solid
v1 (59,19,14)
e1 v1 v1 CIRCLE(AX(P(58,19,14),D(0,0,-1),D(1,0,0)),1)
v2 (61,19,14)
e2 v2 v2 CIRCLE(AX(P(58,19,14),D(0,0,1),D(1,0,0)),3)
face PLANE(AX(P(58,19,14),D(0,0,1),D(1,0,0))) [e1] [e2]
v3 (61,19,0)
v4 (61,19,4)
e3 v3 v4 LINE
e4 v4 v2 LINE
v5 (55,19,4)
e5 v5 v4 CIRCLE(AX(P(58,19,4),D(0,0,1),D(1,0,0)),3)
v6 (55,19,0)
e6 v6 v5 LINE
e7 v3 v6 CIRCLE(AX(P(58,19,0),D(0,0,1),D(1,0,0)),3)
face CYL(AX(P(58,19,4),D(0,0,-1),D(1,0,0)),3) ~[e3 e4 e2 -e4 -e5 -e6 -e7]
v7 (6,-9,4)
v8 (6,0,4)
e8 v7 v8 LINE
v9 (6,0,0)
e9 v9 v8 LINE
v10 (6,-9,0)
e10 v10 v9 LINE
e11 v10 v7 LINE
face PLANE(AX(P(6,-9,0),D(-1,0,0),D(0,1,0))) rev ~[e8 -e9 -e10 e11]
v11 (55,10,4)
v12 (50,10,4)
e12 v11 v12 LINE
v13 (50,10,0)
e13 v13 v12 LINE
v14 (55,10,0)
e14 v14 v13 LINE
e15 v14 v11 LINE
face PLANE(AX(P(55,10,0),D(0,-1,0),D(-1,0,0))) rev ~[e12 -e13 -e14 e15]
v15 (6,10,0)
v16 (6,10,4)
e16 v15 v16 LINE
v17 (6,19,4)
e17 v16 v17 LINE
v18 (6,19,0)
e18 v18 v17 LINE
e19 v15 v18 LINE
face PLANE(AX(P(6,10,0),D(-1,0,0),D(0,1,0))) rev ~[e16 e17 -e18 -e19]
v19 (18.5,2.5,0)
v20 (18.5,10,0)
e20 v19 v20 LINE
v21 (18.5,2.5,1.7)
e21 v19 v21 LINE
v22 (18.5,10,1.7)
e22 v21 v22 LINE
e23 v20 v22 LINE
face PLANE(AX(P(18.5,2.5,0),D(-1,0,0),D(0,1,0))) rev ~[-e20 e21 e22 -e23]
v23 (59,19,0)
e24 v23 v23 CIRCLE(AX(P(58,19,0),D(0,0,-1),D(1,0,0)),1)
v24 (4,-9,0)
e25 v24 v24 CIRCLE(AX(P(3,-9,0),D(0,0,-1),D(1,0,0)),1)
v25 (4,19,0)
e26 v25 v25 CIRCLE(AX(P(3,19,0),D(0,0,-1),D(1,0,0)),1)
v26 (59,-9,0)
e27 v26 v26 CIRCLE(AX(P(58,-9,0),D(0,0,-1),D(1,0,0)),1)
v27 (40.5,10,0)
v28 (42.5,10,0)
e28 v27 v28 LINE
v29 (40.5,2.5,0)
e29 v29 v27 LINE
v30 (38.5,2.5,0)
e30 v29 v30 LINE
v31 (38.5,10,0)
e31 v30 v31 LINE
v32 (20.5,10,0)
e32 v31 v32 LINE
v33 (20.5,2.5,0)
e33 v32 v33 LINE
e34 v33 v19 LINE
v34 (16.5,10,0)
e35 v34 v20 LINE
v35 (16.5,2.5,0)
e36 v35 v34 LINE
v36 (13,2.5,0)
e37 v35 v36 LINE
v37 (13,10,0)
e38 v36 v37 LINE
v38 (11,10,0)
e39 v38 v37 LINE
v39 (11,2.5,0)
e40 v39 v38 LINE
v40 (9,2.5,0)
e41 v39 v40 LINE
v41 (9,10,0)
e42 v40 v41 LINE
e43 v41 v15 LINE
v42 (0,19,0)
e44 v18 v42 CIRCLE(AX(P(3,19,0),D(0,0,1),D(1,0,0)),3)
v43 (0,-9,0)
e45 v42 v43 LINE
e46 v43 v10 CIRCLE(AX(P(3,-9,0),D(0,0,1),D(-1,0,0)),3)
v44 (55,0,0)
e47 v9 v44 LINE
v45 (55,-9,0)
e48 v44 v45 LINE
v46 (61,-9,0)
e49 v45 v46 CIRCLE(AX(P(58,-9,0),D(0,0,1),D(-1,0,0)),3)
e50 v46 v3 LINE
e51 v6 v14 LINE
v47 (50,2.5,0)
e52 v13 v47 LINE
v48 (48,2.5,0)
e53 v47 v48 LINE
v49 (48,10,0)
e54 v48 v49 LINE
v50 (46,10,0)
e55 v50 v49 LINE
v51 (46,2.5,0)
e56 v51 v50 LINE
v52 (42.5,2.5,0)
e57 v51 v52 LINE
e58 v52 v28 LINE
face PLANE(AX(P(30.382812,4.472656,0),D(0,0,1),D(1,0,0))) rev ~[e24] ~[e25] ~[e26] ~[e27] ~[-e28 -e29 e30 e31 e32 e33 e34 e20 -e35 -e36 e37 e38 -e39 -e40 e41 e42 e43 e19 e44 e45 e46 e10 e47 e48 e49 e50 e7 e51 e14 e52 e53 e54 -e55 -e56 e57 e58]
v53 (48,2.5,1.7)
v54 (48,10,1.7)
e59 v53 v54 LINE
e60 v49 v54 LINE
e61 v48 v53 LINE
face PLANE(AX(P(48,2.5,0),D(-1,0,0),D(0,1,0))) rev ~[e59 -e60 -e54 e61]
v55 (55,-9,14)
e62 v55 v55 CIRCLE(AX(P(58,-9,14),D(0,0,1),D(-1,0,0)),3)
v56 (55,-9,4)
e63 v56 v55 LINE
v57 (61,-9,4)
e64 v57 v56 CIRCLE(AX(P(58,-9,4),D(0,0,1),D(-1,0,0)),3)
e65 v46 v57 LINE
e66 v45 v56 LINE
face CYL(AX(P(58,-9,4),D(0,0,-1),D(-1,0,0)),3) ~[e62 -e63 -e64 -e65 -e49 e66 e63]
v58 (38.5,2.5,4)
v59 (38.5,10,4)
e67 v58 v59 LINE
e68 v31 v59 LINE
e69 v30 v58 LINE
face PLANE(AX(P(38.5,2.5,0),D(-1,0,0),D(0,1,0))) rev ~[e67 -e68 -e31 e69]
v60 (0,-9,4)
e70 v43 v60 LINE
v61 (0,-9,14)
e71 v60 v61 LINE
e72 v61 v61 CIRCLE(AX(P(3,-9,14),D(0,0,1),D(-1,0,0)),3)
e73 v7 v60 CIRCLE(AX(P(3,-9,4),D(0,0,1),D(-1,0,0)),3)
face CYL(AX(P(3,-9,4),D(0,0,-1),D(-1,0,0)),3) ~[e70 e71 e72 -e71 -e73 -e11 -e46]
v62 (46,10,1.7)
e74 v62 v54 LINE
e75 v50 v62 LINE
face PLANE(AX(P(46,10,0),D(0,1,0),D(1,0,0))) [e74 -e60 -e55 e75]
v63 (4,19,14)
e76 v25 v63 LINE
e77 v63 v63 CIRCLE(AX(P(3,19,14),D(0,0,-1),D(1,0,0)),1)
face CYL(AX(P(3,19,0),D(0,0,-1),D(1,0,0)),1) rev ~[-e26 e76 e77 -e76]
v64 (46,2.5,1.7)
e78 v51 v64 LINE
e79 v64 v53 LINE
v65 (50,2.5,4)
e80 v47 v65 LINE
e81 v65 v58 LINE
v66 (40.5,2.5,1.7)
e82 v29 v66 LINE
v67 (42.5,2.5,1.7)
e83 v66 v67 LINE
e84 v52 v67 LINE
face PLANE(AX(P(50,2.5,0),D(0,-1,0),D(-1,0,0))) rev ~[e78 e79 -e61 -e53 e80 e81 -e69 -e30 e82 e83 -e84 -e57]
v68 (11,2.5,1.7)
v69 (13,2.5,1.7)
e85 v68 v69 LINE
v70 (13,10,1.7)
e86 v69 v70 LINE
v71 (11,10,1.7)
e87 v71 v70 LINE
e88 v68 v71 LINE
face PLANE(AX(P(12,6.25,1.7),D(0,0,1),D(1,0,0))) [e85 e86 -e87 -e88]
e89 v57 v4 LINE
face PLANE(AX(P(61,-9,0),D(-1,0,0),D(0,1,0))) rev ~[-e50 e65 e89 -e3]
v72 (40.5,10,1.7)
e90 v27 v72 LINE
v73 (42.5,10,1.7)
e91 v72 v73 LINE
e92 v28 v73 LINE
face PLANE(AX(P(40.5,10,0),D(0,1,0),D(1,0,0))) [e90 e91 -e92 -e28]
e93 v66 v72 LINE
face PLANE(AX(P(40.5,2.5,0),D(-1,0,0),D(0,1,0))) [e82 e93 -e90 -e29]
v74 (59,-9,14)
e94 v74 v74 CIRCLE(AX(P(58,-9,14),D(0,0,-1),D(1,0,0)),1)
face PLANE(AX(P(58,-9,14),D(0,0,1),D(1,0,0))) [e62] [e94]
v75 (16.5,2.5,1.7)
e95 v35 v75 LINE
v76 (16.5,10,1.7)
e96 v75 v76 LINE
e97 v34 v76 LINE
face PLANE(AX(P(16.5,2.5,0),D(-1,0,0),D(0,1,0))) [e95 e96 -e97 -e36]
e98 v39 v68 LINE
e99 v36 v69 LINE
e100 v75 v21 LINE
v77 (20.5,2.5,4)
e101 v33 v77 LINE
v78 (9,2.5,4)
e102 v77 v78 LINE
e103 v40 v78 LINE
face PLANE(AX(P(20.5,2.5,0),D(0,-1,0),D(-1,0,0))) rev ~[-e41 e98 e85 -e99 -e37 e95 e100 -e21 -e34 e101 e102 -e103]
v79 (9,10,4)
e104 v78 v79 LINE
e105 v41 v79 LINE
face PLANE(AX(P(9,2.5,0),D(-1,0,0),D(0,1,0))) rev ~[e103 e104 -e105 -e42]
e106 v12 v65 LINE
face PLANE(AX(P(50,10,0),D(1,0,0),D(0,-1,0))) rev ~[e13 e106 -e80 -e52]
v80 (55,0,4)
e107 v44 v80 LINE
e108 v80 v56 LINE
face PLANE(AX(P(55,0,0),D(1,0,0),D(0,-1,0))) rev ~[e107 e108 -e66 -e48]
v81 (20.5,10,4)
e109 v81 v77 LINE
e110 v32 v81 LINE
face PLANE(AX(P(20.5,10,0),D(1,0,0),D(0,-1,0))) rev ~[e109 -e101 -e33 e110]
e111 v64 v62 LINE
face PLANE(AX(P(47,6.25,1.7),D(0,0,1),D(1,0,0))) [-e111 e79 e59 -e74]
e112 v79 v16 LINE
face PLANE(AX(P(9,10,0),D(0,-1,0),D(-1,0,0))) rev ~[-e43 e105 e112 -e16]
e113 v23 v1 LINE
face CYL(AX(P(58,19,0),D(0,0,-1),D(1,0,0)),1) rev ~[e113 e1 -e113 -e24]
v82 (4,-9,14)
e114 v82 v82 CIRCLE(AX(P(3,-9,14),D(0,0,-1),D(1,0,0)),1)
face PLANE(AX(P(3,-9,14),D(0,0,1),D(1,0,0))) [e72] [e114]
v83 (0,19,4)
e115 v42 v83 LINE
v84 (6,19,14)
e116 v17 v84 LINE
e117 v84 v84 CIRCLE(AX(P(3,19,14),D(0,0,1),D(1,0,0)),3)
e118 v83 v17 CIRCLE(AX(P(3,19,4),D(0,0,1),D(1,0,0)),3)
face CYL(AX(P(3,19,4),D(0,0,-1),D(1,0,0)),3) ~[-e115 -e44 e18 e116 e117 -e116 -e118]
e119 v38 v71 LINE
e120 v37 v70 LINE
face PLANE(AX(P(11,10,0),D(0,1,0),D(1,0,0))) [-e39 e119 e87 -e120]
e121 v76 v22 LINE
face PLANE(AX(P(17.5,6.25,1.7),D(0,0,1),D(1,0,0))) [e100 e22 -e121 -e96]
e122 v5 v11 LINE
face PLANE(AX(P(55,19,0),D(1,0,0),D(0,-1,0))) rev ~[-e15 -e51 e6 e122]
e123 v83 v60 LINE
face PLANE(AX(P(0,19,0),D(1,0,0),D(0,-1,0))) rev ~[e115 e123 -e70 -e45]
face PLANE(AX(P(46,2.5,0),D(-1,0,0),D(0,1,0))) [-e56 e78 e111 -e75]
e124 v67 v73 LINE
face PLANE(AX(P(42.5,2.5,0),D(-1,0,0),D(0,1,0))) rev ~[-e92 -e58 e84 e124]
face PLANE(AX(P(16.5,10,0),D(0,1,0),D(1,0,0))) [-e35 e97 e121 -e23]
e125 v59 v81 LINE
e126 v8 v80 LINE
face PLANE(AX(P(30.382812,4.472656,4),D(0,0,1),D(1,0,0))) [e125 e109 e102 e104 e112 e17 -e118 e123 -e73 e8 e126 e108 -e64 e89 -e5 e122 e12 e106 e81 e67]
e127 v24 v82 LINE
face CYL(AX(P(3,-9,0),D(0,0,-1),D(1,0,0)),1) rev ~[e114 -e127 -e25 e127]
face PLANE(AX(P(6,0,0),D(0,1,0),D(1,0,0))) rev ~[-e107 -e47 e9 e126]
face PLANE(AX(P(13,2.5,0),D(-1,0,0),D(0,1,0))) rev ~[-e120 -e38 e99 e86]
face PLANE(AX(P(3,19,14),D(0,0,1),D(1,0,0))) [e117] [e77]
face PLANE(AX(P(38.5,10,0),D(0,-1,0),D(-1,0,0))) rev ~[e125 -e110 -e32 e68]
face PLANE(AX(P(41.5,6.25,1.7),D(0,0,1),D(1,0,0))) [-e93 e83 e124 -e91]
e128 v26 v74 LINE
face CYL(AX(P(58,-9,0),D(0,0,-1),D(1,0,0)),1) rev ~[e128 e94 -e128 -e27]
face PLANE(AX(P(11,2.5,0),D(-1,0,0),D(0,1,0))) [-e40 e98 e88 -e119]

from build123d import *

# Parameters (mm, degrees)
F1_DEPTH = 4
F2_W     = 2
F2_H     = 7.5
F3_DEPTH = 1.7
F5_DEPTH = 10
F6_R     = 1
F7_DEPTH = 25


with BuildPart() as f1:
    # F0 (on Top) → F1 (new body)
    with BuildSketch(Plane.XY):
        with BuildLine():
            Line((6, 0), (55, 0))
            Line((55, 0), (55, -9))
            ThreePointArc((55, -9), (58, -12), (61, -9))
            Line((61, -9), (61, 19))
            ThreePointArc((61, 19), (58, 22), (55, 19))
            Line((55, 19), (55, 10))
            Line((55, 10), (50, 10))
            Line((50, 10), (50, 2.5))
            Line((50, 2.5), (38.5, 2.5))
            Line((38.5, 2.5), (38.5, 10))
            Line((38.5, 10), (20.5, 10))
            Line((20.5, 10), (20.5, 2.5))
            Line((20.5, 2.5), (9, 2.5))
            Line((9, 2.5), (9, 10))
            Line((9, 10), (6, 10))
            Line((6, 10), (6, 19))
            ThreePointArc((6, 19), (3, 22), (0, 19))
            Line((0, 19), (0, -9))
            ThreePointArc((0, -9), (3, -12), (6, -9))
            Line((6, -9), (6, 0))
        make_face()
    extrude(amount=F1_DEPTH)

    # F2 (on Top) → F3 (join)
    with BuildSketch(Plane.XY):
        with Locations((12, 6.25)):
            Rectangle(F2_W, F2_H)
        with Locations((17.5, 6.25)):
            Rectangle(F2_W, F2_H)
        with Locations((41.5, 6.25)):
            Rectangle(F2_W, F2_H)
        with Locations((47, 6.25)):
            Rectangle(F2_W, F2_H)
    extrude(amount=F3_DEPTH)

    # F4 (on face) → F5 (join)
    with BuildSketch(Plane.XY.offset(4)):
        with BuildLine():
            ThreePointArc((0, 19), (3, 16), (6, 19))
            ThreePointArc((6, 19), (3, 22), (0, 19))
        make_face()
        with BuildLine():
            ThreePointArc((6, -9), (3, -6), (0, -9))
            ThreePointArc((0, -9), (3, -12), (6, -9))
        make_face()
        with BuildLine():
            ThreePointArc((61, -9), (58, -6), (55, -9))
            ThreePointArc((55, -9), (58, -12), (61, -9))
        make_face()
        with BuildLine():
            ThreePointArc((55, 19), (58, 16), (61, 19))
            ThreePointArc((61, 19), (58, 22), (55, 19))
        make_face()
    extrude(amount=F5_DEPTH)

    # F6 (on face) → F7 (cut)
    with BuildSketch(Plane(origin=(0, 0, 0), x_dir=(1, 0, 0), z_dir=(0, 0, -1))):
        with Locations((3, 9)):
            Circle(F6_R)
        with Locations((58, 9)):
            Circle(F6_R)
        with Locations((58, -19)):
            Circle(F6_R)
        with Locations((3, -19)):
            Circle(F6_R)
    extrude(amount=-F7_DEPTH, mode=Mode.SUBTRACT)


solid = f1.part
